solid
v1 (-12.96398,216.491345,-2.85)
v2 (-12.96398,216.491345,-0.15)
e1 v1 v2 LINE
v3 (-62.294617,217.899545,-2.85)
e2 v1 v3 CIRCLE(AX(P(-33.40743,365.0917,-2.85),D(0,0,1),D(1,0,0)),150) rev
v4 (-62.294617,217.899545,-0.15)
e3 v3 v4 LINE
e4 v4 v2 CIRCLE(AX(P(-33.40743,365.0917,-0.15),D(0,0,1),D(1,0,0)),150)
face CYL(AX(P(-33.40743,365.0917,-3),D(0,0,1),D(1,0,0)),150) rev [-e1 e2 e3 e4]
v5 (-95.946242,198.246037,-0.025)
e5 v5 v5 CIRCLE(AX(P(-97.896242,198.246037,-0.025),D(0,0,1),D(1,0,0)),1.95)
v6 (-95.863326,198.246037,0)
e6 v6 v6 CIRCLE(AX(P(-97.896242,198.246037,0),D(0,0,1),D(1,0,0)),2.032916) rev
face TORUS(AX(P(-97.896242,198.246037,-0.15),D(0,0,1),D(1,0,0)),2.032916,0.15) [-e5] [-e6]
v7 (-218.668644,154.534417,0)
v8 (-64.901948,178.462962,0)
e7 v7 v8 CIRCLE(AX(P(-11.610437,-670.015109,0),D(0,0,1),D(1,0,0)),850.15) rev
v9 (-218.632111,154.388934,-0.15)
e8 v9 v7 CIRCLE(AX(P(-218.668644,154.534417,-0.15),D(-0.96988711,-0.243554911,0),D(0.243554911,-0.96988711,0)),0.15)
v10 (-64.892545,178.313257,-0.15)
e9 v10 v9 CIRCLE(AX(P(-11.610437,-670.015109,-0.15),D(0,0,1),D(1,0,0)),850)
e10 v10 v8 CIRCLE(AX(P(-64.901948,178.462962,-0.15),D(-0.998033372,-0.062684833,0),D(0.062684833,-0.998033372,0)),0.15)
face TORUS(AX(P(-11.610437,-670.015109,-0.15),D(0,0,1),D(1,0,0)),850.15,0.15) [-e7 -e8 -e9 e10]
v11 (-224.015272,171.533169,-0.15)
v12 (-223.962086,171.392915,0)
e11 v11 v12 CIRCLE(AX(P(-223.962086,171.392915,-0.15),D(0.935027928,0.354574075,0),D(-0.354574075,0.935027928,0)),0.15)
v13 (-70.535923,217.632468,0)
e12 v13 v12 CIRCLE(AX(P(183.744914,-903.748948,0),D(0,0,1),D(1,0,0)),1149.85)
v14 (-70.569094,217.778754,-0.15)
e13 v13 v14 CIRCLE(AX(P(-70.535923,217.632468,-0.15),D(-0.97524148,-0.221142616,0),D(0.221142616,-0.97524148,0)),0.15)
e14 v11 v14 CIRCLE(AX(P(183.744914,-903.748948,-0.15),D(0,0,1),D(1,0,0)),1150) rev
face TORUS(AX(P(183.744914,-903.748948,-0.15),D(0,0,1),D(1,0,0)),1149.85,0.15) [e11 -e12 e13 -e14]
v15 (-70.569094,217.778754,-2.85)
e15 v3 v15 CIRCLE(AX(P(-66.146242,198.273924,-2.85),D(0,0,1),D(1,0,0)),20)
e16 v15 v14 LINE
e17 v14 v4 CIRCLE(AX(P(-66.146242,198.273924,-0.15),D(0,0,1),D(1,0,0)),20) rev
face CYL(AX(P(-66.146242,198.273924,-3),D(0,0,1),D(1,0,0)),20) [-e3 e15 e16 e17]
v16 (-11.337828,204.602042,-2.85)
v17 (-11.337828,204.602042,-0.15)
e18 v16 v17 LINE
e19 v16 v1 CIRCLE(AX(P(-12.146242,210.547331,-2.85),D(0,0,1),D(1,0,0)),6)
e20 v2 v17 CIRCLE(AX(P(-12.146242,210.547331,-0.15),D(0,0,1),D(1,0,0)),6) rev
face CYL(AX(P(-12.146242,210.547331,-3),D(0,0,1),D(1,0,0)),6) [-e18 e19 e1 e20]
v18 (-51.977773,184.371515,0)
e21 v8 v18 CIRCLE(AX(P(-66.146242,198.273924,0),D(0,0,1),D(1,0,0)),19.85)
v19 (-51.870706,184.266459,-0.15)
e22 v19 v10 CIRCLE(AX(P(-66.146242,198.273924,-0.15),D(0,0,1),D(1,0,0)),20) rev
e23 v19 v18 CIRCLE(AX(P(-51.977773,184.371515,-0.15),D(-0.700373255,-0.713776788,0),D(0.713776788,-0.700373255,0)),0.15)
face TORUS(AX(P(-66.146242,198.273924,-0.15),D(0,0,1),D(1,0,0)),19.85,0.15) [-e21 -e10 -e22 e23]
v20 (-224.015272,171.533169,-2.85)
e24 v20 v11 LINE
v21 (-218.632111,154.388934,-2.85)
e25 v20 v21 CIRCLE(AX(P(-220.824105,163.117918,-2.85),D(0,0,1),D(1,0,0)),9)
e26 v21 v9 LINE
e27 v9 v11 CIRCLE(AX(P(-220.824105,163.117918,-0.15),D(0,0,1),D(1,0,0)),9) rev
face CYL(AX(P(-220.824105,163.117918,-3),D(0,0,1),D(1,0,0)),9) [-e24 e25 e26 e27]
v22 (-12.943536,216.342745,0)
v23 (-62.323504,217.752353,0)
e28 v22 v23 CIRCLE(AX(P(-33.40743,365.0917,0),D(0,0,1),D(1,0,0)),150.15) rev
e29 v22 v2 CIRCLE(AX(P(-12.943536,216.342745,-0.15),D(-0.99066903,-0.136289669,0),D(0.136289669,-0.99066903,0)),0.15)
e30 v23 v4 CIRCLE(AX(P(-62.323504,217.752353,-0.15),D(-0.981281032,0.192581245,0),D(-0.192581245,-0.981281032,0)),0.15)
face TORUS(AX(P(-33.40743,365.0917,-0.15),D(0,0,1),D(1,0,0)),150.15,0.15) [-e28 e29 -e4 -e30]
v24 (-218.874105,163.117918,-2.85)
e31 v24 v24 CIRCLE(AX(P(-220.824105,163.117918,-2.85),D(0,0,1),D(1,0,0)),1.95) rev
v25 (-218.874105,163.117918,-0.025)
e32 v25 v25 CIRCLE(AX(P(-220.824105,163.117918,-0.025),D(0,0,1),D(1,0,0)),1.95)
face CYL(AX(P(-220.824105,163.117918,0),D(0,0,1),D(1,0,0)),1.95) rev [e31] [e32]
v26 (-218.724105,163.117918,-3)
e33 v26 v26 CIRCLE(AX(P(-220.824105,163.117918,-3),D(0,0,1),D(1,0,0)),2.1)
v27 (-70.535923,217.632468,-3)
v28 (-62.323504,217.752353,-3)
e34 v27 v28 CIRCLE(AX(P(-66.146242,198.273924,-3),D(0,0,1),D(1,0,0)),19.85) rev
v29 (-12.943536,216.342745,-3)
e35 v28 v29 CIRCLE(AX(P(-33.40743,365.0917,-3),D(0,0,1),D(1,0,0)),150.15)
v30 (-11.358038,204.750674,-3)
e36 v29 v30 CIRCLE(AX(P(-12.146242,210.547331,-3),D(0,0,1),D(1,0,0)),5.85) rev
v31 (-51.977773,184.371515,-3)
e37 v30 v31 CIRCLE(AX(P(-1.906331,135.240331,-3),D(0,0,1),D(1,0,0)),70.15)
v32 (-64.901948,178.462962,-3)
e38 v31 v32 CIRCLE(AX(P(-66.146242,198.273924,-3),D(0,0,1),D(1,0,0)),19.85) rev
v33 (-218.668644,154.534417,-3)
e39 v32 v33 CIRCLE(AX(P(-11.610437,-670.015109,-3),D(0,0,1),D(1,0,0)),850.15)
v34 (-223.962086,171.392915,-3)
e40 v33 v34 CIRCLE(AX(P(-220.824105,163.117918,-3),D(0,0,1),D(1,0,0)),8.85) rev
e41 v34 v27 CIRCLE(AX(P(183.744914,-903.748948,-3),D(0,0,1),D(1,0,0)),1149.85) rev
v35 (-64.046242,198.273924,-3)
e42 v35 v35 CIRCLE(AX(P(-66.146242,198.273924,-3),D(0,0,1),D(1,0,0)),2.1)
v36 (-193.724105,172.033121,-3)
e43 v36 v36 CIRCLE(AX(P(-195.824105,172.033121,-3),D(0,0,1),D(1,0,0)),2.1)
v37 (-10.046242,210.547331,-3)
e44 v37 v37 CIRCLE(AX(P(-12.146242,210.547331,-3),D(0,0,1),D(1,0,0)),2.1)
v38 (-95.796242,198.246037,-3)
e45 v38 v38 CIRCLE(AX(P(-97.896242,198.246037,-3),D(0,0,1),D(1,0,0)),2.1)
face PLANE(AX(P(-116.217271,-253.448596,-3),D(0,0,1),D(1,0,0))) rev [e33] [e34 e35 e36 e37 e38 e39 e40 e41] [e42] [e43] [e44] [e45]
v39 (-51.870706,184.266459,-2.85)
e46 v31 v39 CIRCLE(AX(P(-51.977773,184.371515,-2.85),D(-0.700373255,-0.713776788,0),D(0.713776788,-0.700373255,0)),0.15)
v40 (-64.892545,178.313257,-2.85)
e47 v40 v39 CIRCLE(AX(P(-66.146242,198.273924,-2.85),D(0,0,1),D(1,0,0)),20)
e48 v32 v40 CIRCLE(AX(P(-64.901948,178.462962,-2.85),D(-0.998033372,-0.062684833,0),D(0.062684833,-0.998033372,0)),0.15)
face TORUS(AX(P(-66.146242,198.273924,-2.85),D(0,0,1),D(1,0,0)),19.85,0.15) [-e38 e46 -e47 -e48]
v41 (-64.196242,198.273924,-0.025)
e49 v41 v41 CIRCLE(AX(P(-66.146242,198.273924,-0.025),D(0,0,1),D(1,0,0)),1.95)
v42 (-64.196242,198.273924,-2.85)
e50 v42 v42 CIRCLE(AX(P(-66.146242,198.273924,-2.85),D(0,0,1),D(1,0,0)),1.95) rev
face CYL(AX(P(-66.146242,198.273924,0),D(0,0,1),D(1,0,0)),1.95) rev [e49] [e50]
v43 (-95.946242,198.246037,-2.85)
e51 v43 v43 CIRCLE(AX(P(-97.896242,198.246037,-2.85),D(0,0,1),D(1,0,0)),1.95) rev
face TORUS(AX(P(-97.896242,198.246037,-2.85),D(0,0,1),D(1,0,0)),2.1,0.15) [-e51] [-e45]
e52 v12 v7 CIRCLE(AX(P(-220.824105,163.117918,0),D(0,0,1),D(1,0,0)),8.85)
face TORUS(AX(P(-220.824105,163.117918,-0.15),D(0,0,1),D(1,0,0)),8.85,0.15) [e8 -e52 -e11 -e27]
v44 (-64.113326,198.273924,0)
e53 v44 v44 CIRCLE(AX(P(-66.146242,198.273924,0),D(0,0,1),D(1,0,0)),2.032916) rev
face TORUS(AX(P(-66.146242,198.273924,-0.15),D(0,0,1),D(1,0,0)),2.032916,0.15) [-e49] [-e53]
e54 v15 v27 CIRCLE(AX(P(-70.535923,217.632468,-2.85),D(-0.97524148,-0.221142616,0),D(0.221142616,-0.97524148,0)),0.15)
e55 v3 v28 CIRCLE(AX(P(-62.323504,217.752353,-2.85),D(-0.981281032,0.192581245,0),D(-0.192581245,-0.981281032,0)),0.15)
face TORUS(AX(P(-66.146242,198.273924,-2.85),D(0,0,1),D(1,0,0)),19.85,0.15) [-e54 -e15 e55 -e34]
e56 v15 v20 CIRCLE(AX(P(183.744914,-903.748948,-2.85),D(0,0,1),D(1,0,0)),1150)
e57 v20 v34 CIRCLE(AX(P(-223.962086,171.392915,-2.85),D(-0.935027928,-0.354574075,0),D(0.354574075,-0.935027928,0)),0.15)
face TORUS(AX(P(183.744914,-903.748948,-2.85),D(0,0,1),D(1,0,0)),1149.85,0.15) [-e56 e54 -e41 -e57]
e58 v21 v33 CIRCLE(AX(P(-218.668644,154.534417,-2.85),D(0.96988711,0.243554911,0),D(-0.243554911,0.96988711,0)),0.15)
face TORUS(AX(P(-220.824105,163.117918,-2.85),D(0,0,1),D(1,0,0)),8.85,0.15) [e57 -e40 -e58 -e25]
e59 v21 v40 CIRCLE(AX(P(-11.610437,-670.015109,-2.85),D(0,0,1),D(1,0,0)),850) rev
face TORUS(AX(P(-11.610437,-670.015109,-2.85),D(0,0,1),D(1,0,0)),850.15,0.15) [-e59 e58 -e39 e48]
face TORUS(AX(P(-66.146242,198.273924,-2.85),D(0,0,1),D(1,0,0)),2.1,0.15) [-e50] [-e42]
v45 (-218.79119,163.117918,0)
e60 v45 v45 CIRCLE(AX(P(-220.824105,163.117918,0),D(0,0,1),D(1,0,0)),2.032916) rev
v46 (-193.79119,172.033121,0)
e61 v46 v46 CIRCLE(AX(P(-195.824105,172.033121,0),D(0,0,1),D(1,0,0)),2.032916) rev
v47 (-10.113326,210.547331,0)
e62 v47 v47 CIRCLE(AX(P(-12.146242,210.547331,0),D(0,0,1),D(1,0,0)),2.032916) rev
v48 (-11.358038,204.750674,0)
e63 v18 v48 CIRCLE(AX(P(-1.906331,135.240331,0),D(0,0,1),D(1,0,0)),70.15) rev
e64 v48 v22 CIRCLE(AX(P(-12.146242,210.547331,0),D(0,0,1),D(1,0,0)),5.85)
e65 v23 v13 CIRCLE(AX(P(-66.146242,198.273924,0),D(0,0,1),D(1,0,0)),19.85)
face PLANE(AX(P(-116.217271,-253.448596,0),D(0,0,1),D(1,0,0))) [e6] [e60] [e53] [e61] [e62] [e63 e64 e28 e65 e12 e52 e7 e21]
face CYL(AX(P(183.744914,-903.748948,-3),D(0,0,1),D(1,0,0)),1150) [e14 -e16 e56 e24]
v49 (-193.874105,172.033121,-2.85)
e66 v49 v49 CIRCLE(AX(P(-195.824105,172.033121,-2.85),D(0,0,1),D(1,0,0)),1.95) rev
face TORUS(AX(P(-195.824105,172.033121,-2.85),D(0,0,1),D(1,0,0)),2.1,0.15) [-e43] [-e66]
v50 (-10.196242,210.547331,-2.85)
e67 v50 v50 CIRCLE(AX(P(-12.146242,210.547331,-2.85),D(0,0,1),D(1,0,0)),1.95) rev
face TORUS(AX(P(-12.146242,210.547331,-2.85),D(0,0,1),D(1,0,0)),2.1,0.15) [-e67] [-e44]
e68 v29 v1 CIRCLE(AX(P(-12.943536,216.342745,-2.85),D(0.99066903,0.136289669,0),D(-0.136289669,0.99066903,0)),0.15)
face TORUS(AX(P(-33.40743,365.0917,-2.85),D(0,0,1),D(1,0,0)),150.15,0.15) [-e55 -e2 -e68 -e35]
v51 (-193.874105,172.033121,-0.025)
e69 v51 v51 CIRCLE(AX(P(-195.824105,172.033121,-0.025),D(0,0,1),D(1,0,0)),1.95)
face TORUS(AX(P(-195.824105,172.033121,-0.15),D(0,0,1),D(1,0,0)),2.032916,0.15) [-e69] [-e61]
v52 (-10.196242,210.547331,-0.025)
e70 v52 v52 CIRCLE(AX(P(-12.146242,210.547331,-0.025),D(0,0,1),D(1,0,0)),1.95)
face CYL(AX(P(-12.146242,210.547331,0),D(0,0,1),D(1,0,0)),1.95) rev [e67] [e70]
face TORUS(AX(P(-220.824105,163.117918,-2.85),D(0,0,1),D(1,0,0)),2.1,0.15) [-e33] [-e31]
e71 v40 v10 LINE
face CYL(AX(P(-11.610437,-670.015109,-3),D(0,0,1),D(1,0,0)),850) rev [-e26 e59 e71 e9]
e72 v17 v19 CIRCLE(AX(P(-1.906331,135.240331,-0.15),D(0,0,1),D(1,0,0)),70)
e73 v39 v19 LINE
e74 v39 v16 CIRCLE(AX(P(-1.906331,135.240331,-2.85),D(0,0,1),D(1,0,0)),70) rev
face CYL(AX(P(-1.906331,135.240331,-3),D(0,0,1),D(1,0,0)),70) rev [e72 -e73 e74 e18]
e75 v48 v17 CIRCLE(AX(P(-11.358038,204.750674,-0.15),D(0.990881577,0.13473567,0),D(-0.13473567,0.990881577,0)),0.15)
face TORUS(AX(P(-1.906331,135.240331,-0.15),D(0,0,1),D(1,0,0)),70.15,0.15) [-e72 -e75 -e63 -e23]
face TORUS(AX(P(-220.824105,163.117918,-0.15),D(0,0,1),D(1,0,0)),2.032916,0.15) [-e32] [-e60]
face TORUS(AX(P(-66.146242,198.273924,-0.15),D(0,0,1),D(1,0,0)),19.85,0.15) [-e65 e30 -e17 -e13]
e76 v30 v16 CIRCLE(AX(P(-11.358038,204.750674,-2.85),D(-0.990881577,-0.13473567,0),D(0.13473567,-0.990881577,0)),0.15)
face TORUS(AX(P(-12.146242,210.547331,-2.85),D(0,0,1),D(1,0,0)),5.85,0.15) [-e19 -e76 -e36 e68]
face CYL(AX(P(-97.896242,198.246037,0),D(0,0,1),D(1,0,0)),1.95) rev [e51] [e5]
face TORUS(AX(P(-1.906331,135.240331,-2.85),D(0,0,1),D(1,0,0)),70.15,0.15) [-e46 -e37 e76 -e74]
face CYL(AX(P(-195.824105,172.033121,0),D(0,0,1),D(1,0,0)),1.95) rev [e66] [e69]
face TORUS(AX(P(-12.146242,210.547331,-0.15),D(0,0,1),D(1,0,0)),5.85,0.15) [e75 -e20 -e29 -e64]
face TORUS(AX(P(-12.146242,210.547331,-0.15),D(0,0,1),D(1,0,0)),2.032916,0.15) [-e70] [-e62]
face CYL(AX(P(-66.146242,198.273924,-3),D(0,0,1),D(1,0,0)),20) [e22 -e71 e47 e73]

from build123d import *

# Parameters (mm, degrees)
BOSS_EXTRUDE1_DEPTH              = 3
M3_5_CLEARANCE_HOLE1_D           = 3.9
M3_5_CLEARANCE_HOLE1_DEPTH       = 10
M3_5_CLEARANCE_HOLE1_CSINK_D     = 3.95
M3_5_CLEARANCE_HOLE1_CSINK_ANGLE = 90
M3_5_CLEARANCE_HOLE1_TIP         = 1.171678207
FILLET1_R                        = 0.15


with BuildPart() as part:
    # Sketch1 → Boss-Extrude1 (new body)
    with BuildSketch(Plane.XY):
        with BuildLine():
            ThreePointArc((-224.015272003, 171.533169094), (-148.098758742, 197.332237707), (-70.569094062, 217.778753835))
            ThreePointArc((-70.569094062, 217.778753835), (-66.438171207, 218.27179356), (-62.294616847, 217.899544886))
            ThreePointArc((-62.294616847, 217.899544886), (-37.687608562, 215.152778571), (-12.963979761, 216.491345274))
            ThreePointArc((-12.963979761, 216.491345274), (-6.2015881, 211.360407363), (-11.337827727, 204.602041635))
            ThreePointArc((-11.337827727, 204.602041635), (-33.296637982, 197.807484116), (-51.870705986, 184.266459136))
            ThreePointArc((-51.870705986, 184.266459136), (-57.830628756, 180.084625725), (-64.892545086, 178.313256803))
            ThreePointArc((-64.892545086, 178.313256803), (-142.310888673, 169.876188253), (-218.632111132, 154.388933759))
            ThreePointArc((-218.632111132, 154.388933759), (-229.410768693, 160.421770071), (-224.015272003, 171.533169094))
        make_face()
    extrude(amount=-BOSS_EXTRUDE1_DEPTH)

    # M3.5 Clearance Hole1
    with Locations(Plane.XY):
        with Locations((-220.824105329, 163.117917746), (-195.824105329, 172.033120757), (-97.896241747, 198.246037312), (-66.146241747, 198.273924243), (-12.146241747, 210.547331096)):
            CounterSinkHole(M3_5_CLEARANCE_HOLE1_D / 2, M3_5_CLEARANCE_HOLE1_CSINK_D / 2, depth=M3_5_CLEARANCE_HOLE1_DEPTH, counter_sink_angle=M3_5_CLEARANCE_HOLE1_CSINK_ANGLE)
            with Locations((0, 0, -(M3_5_CLEARANCE_HOLE1_DEPTH + M3_5_CLEARANCE_HOLE1_TIP / 2))):  # 118° drill point
                Cone(0, M3_5_CLEARANCE_HOLE1_D / 2, M3_5_CLEARANCE_HOLE1_TIP, mode=Mode.SUBTRACT)

    # Fillet1
    # the kernel refuses this fillet: 0.15 mm, written as the material it takes off along each edge
    with BuildSketch(Plane(origin=(-1.906330822, 135.24033126, 0), x_dir=(-0.1347356700689116, 0.9908815767845728, 0), z_dir=(0.9908815767845728, 0.1347356700689116, 0))) as fillet1_piece_1:
        with BuildLine():
            CenterArc((70 + FILLET1_R, -FILLET1_R), FILLET1_R, 90, 90)
            Line((70 + FILLET1_R, 0), (70 + FILLET1_R, FILLET1_R * 0.02))
            Line((70 + FILLET1_R, FILLET1_R * 0.02), (70 - FILLET1_R * 0.0200000000001, FILLET1_R * 0.02))
            Line((70 - FILLET1_R * 0.0200000000001, FILLET1_R * 0.02), (70 - FILLET1_R * 0.0200000000001, -FILLET1_R))
            Line((70 - FILLET1_R * 0.0200000000001, -FILLET1_R), (70, -FILLET1_R))
        make_face()
    revolve(axis=Axis((-1.906330822, 135.24033126, 0), (0, 0, 1)), revolution_arc=37.799706741, mode=Mode.SUBTRACT)
    with BuildSketch(Plane(origin=(-66.146241747, 198.273924243, 0), x_dir=(0.7137767880581837, -0.7003732553641258, 0), z_dir=(0.7003732553641258, 0.7137767880581837, 0))) as fillet1_piece_2:
        with BuildLine():
            CenterArc((20 - FILLET1_R, FILLET1_R), FILLET1_R, 270, 90)
            Line((20 - FILLET1_R, 0), (20 - FILLET1_R, -FILLET1_R * 0.02))
            Line((20 - FILLET1_R, -FILLET1_R * 0.02), (20 + FILLET1_R * 0.02, -FILLET1_R * 0.02))
            Line((20 + FILLET1_R * 0.02, -FILLET1_R * 0.02), (20 + FILLET1_R * 0.0199999999999, FILLET1_R))
            Line((20 + FILLET1_R * 0.0199999999999, FILLET1_R), (20, FILLET1_R))
        make_face()
    revolve(axis=Axis((-66.146241747, 198.273924243, 0), (0, 0, -1)), revolution_arc=41.949109333, mode=Mode.SUBTRACT)
    with BuildSketch(Plane(origin=(-11.610436968, -670.01510943, 0), x_dir=(-0.0626848330802095, 0.9980333720380827, 0), z_dir=(0.9980333720380827, 0.0626848330802095, 0))) as fillet1_piece_3:
        with BuildLine():
            CenterArc((850 + FILLET1_R, -FILLET1_R), FILLET1_R, 90, 90)
            Line((850, -FILLET1_R), (850 - FILLET1_R * 0.0200000000003, -FILLET1_R))
            Line((850 - FILLET1_R * 0.0200000000003, -FILLET1_R), (850 - FILLET1_R * 0.0200000000003, FILLET1_R * 0.02))
            Line((850 - FILLET1_R * 0.0200000000003, FILLET1_R * 0.02), (850 + FILLET1_R, FILLET1_R * 0.02))
            Line((850 + FILLET1_R, FILLET1_R * 0.02), (850 + FILLET1_R, 0))
        make_face()
    revolve(axis=Axis((-11.610436968, -670.01510943, 0), (0, 0, 1)), revolution_arc=10.502516864, mode=Mode.SUBTRACT)
    with BuildSketch(Plane(origin=(-220.824105329, 163.117917746, 0), x_dir=(0.24355491078225822, -0.9698871096338203, 0), z_dir=(0.9698871096338203, 0.24355491078225822, 0))) as fillet1_piece_4:
        with BuildLine():
            CenterArc((9 - FILLET1_R, FILLET1_R), FILLET1_R, 270, 90)
            Line((9 - FILLET1_R, 0), (9 - FILLET1_R, -FILLET1_R * 0.02))
            Line((9 - FILLET1_R, -FILLET1_R * 0.02), (9 + FILLET1_R * 0.0200000000001, -FILLET1_R * 0.02))
            Line((9 + FILLET1_R * 0.0200000000001, -FILLET1_R * 0.02), (9 + FILLET1_R * 0.0200000000001, FILLET1_R))
            Line((9 + FILLET1_R * 0.0200000000001, FILLET1_R), (9, FILLET1_R))
        make_face()
    revolve(axis=Axis((-220.824105329, 163.117917746, 0), (0, 0, -1)), revolution_arc=173.329106849, mode=Mode.SUBTRACT)
    with BuildSketch(Plane(origin=(-66.146241747, 198.273924243, -3), x_dir=(0.7137767880581837, -0.7003732553641258, 0), z_dir=(0.7003732553641258, 0.7137767880581837, 0))) as fillet1_piece_5:
        with BuildLine():
            CenterArc((20 - FILLET1_R, -FILLET1_R), FILLET1_R, 0, 90)
            Line((20, -FILLET1_R), (20 + FILLET1_R * 0.0199999999999, -FILLET1_R))
            Line((20 + FILLET1_R * 0.0199999999999, -FILLET1_R), (20 + FILLET1_R * 0.02, FILLET1_R * 0.02))
            Line((20 + FILLET1_R * 0.02, FILLET1_R * 0.02), (20 - FILLET1_R, FILLET1_R * 0.02))
            Line((20 - FILLET1_R, FILLET1_R * 0.02), (20 - FILLET1_R, 0))
        make_face()
    revolve(axis=Axis((-66.146241747, 198.273924243, -3), (0, 0, -1)), revolution_arc=41.949109333, mode=Mode.SUBTRACT)
    with BuildSketch(Plane(origin=(-1.906330822, 135.24033126, -3), x_dir=(-0.1347356700689116, 0.9908815767845728, 0), z_dir=(0.9908815767845728, 0.1347356700689116, 0))) as fillet1_piece_6:
        with BuildLine():
            CenterArc((70 + FILLET1_R, FILLET1_R), FILLET1_R, 180, 90)
            Line((70, FILLET1_R), (70 - FILLET1_R * 0.0200000000001, FILLET1_R))
            Line((70 - FILLET1_R * 0.0200000000001, FILLET1_R), (70 - FILLET1_R * 0.0200000000001, -FILLET1_R * 0.02))
            Line((70 - FILLET1_R * 0.0200000000001, -FILLET1_R * 0.02), (70 + FILLET1_R, -FILLET1_R * 0.02))
            Line((70 + FILLET1_R, -FILLET1_R * 0.02), (70 + FILLET1_R, 0))
        make_face()
    revolve(axis=Axis((-1.906330822, 135.24033126, -3), (0, 0, 1)), revolution_arc=37.799706741, mode=Mode.SUBTRACT)
    with BuildSketch(Plane(origin=(-12.146241747, 210.547331096, -3), x_dir=(-0.1362896688862403, 0.9906690295728836, 0), z_dir=(-0.9906690295728836, -0.1362896688862403, 0))) as fillet1_piece_7:
        with BuildLine():
            CenterArc((6 - FILLET1_R, -FILLET1_R), FILLET1_R, 0, 90)
            Line((6, -FILLET1_R), (6 + FILLET1_R * 0.02, -FILLET1_R))
            Line((6 + FILLET1_R * 0.02, -FILLET1_R), (6 + FILLET1_R * 0.02, FILLET1_R * 0.02))
            Line((6 + FILLET1_R * 0.02, FILLET1_R * 0.02), (6 - FILLET1_R, FILLET1_R * 0.02))
            Line((6 - FILLET1_R, FILLET1_R * 0.02), (6 - FILLET1_R, 0))
        make_face()
    revolve(axis=Axis((-12.146241747, 210.547331096, -3), (0, 0, -1)), revolution_arc=180.089866547, mode=Mode.SUBTRACT)
    with BuildSketch(Plane(origin=(-33.407430094, 365.091699709, -3), x_dir=(-0.19258124502204366, -0.9812810321542751, 0), z_dir=(-0.9812810321542751, 0.19258124502204366, 0))) as fillet1_piece_8:
        with BuildLine():
            CenterArc((150 + FILLET1_R, FILLET1_R), FILLET1_R, 180, 90)
            Line((150, FILLET1_R), (150 - FILLET1_R * 0.0199999999999, FILLET1_R))
            Line((150 - FILLET1_R * 0.0199999999999, FILLET1_R), (150 - FILLET1_R * 0.0199999999999, -FILLET1_R * 0.02))
            Line((150 - FILLET1_R * 0.0199999999999, -FILLET1_R * 0.02), (150 + FILLET1_R, -FILLET1_R * 0.02))
            Line((150 + FILLET1_R, -FILLET1_R * 0.02), (150 + FILLET1_R, 0))
        make_face()
    revolve(axis=Axis((-33.407430094, 365.091699709, -3), (0, 0, 1)), revolution_arc=18.936662977, mode=Mode.SUBTRACT)
    with BuildSketch(Plane(origin=(-66.146241747, 198.273924243, -3), x_dir=(-0.22114261575913643, 0.9752414795809328, 0), z_dir=(-0.9752414795809328, -0.22114261575913643, 0))) as fillet1_piece_9:
        with BuildLine():
            CenterArc((20 - FILLET1_R, -FILLET1_R), FILLET1_R, 0, 90)
            Line((20, -FILLET1_R), (20 + FILLET1_R * 0.02, -FILLET1_R))
            Line((20 + FILLET1_R * 0.02, -FILLET1_R), (20 + FILLET1_R * 0.02, FILLET1_R * 0.02))
            Line((20 + FILLET1_R * 0.02, FILLET1_R * 0.02), (20 - FILLET1_R, FILLET1_R * 0.02))
            Line((20 - FILLET1_R, FILLET1_R * 0.02), (20 - FILLET1_R, 0))
        make_face()
    revolve(axis=Axis((-66.146241747, 198.273924243, -3), (0, 0, -1)), revolution_arc=23.879614349, mode=Mode.SUBTRACT)
    with BuildSketch(Plane(origin=(-12.146241747, 210.547331096, -3), x_dir=(-1, 0, 0), z_dir=(0, -1, 0))) as fillet1_piece_10:
        with BuildLine():
            CenterArc((1.95 + FILLET1_R, -FILLET1_R), FILLET1_R, 90, 90)
            Line((1.95, -FILLET1_R), (1.95 - FILLET1_R * 0.02, -FILLET1_R))
            Line((1.95 - FILLET1_R * 0.02, -FILLET1_R), (1.95 - FILLET1_R * 0.02, FILLET1_R * 0.02))
            Line((1.95 - FILLET1_R * 0.02, FILLET1_R * 0.02), (1.95 + FILLET1_R, FILLET1_R * 0.02))
            Line((1.95 + FILLET1_R, FILLET1_R * 0.02), (1.95 + FILLET1_R, 0))
        make_face()
    revolve(axis=Axis((-12.146241747, 210.547331096, -3), (0, 0, -1)), mode=Mode.SUBTRACT)
    with BuildSketch(Plane(origin=(-12.146241747, 210.547331096, 0), x_dir=(-1, 0, 0), z_dir=(0, -1, 0))) as fillet1_piece_11:
        with BuildLine():
            CenterArc((2.03291562, 0.15), FILLET1_R, 236.442690238, 33.557309762)
            Line((2.03291562, 0), (2.03291562, -0.003))
            Line((2.03291562, -0.003), (1.975, -0.003))
            Line((1.975, -0.003), (1.97287868, -0.00212132))
            ThreePointArc((1.97287868, -0.00212132), (1.96037868, 0.01037868), (1.948341688, 0.0225))
            Line((1.948341688, 0.0225), (1.95, 0.025))
        make_face()
    revolve(axis=Axis((-12.146241747, 210.547331096, 0), (0, 0, -1)), mode=Mode.SUBTRACT)
    with BuildSketch(Plane(origin=(183.744914061, -903.748947683, -3), x_dir=(-0.3545740748378603, 0.935027927632579, 0), z_dir=(-0.935027927632579, -0.3545740748378603, 0))) as fillet1_piece_12:
        with BuildLine():
            CenterArc((1150 - FILLET1_R, -FILLET1_R), FILLET1_R, 0, 90)
            Line((1150, -FILLET1_R), (1150 + FILLET1_R * 0.020000000001, -FILLET1_R))
            Line((1150 + FILLET1_R * 0.020000000001, -FILLET1_R), (1150 + FILLET1_R * 0.020000000001, FILLET1_R * 0.02))
            Line((1150 + FILLET1_R * 0.020000000001, FILLET1_R * 0.02), (1150 - FILLET1_R, FILLET1_R * 0.02))
            Line((1150 - FILLET1_R, FILLET1_R * 0.02), (1150 - FILLET1_R, 0))
        make_face()
    revolve(axis=Axis((183.744914061, -903.748947683, -3), (0, 0, -1)), revolution_arc=7.991189503, mode=Mode.SUBTRACT)
    with BuildSketch(Plane(origin=(-66.146241747, 198.273924243, -3), x_dir=(-1, 0, 0), z_dir=(0, -1, 0))) as fillet1_piece_13:
        with BuildLine():
            CenterArc((1.95 + FILLET1_R, -FILLET1_R), FILLET1_R, 90, 90)
            Line((1.95, -FILLET1_R), (1.95 - FILLET1_R * 0.02, -FILLET1_R))
            Line((1.95 - FILLET1_R * 0.02, -FILLET1_R), (1.95 - FILLET1_R * 0.02, FILLET1_R * 0.02))
            Line((1.95 - FILLET1_R * 0.02, FILLET1_R * 0.02), (1.95 + FILLET1_R, FILLET1_R * 0.02))
            Line((1.95 + FILLET1_R, FILLET1_R * 0.02), (1.95 + FILLET1_R, 0))
        make_face()
    revolve(axis=Axis((-66.146241747, 198.273924243, -3), (0, 0, -1)), mode=Mode.SUBTRACT)
    with BuildSketch(Plane(origin=(-66.146241747, 198.273924243, 0), x_dir=(-1, 0, 0), z_dir=(0, -1, 0))) as fillet1_piece_14:
        with BuildLine():
            CenterArc((2.03291562, 0.15), FILLET1_R, 236.442690238, 33.557309762)
            Line((2.03291562, 0), (2.03291562, -0.003))
            Line((2.03291562, -0.003), (1.975, -0.003))
            Line((1.975, -0.003), (1.97287868, -0.00212132))
            ThreePointArc((1.97287868, -0.00212132), (1.96037868, 0.01037868), (1.948341688, 0.0225))
            Line((1.948341688, 0.0225), (1.95, 0.025))
        make_face()
    revolve(axis=Axis((-66.146241747, 198.273924243, 0), (0, 0, -1)), mode=Mode.SUBTRACT)
    with BuildSketch(Plane(origin=(-97.896241747, 198.246037312, -3), x_dir=(-1, 0, 0), z_dir=(0, -1, 0))) as fillet1_piece_15:
        with BuildLine():
            CenterArc((1.95 + FILLET1_R, -FILLET1_R), FILLET1_R, 90, 90)
            Line((1.95, -FILLET1_R), (1.95 - FILLET1_R * 0.02, -FILLET1_R))
            Line((1.95 - FILLET1_R * 0.02, -FILLET1_R), (1.95 - FILLET1_R * 0.02, FILLET1_R * 0.02))
            Line((1.95 - FILLET1_R * 0.02, FILLET1_R * 0.02), (1.95 + FILLET1_R, FILLET1_R * 0.02))
            Line((1.95 + FILLET1_R, FILLET1_R * 0.02), (1.95 + FILLET1_R, 0))
        make_face()
    revolve(axis=Axis((-97.896241747, 198.246037312, -3), (0, 0, -1)), mode=Mode.SUBTRACT)
    with BuildSketch(Plane(origin=(-97.896241747, 198.246037312, 0), x_dir=(-1, 0, 0), z_dir=(0, -1, 0))) as fillet1_piece_16:
        with BuildLine():
            CenterArc((2.03291562, 0.15), FILLET1_R, 236.442690238, 33.557309762)
            Line((2.03291562, 0), (2.03291562, -0.003))
            Line((2.03291562, -0.003), (1.975, -0.003))
            Line((1.975, -0.003), (1.97287868, -0.00212132))
            ThreePointArc((1.97287868, -0.00212132), (1.96037868, 0.01037868), (1.948341688, 0.0225))
            Line((1.948341688, 0.0225), (1.95, 0.025))
        make_face()
    revolve(axis=Axis((-97.896241747, 198.246037312, 0), (0, 0, -1)), mode=Mode.SUBTRACT)
    with BuildSketch(Plane(origin=(-220.824105329, 163.117917746, -3), x_dir=(0.24355491078225822, -0.9698871096338203, 0), z_dir=(0.9698871096338203, 0.24355491078225822, 0))) as fillet1_piece_17:
        with BuildLine():
            CenterArc((9 - FILLET1_R, -FILLET1_R), FILLET1_R, 0, 90)
            Line((9 - FILLET1_R, 0), (9 - FILLET1_R, FILLET1_R * 0.02))
            Line((9 - FILLET1_R, FILLET1_R * 0.02), (9 + FILLET1_R * 0.0200000000001, FILLET1_R * 0.02))
            Line((9 + FILLET1_R * 0.0200000000001, FILLET1_R * 0.02), (9 + FILLET1_R * 0.0200000000001, -FILLET1_R))
            Line((9 + FILLET1_R * 0.0200000000001, -FILLET1_R), (9, -FILLET1_R))
        make_face()
    revolve(axis=Axis((-220.824105329, 163.117917746, -3), (0, 0, -1)), revolution_arc=173.329106849, mode=Mode.SUBTRACT)
    with BuildSketch(Plane(origin=(-195.824105329, 172.033120757, -3), x_dir=(-1, 0, 0), z_dir=(0, -1, 0))) as fillet1_piece_18:
        with BuildLine():
            CenterArc((1.95 + FILLET1_R, -FILLET1_R), FILLET1_R, 90, 90)
            Line((1.95, -FILLET1_R), (1.95 - FILLET1_R * 0.0199999999999, -FILLET1_R))
            Line((1.95 - FILLET1_R * 0.0199999999999, -FILLET1_R), (1.95 - FILLET1_R * 0.0199999999999, FILLET1_R * 0.02))
            Line((1.95 - FILLET1_R * 0.0199999999999, FILLET1_R * 0.02), (1.95 + FILLET1_R, FILLET1_R * 0.02))
            Line((1.95 + FILLET1_R, FILLET1_R * 0.02), (1.95 + FILLET1_R, 0))
        make_face()
    revolve(axis=Axis((-195.824105329, 172.033120757, -3), (0, 0, -1)), mode=Mode.SUBTRACT)
    with BuildSketch(Plane(origin=(-195.824105329, 172.033120757, 0), x_dir=(-1, 0, 0), z_dir=(0, -1, 0))) as fillet1_piece_19:
        with BuildLine():
            CenterArc((2.03291562, 0.15), FILLET1_R, 236.442690238, 33.557309762)
            Line((2.03291562, 0), (2.03291562, -0.003))
            Line((2.03291562, -0.003), (1.975, -0.003))
            Line((1.975, -0.003), (1.97287868, -0.00212132))
            ThreePointArc((1.97287868, -0.00212132), (1.96037868, 0.01037868), (1.948341688, 0.0225))
            Line((1.948341688, 0.0225), (1.95, 0.025))
        make_face()
    revolve(axis=Axis((-195.824105329, 172.033120757, 0), (0, 0, -1)), mode=Mode.SUBTRACT)
    with BuildSketch(Plane(origin=(-220.824105329, 163.117917746, -3), x_dir=(-1, 0, 0), z_dir=(0, -1, 0))) as fillet1_piece_20:
        with BuildLine():
            CenterArc((1.95 + FILLET1_R, -FILLET1_R), FILLET1_R, 90, 90)
            Line((1.95, -FILLET1_R), (1.95 - FILLET1_R * 0.0199999999999, -FILLET1_R))
            Line((1.95 - FILLET1_R * 0.0199999999999, -FILLET1_R), (1.95 - FILLET1_R * 0.0199999999999, FILLET1_R * 0.02))
            Line((1.95 - FILLET1_R * 0.0199999999999, FILLET1_R * 0.02), (1.95 + FILLET1_R, FILLET1_R * 0.02))
            Line((1.95 + FILLET1_R, FILLET1_R * 0.02), (1.95 + FILLET1_R, 0))
        make_face()
    revolve(axis=Axis((-220.824105329, 163.117917746, -3), (0, 0, -1)), mode=Mode.SUBTRACT)
    with BuildSketch(Plane(origin=(-220.824105329, 163.117917746, 0), x_dir=(-1, 0, 0), z_dir=(0, -1, 0))) as fillet1_piece_21:
        with BuildLine():
            CenterArc((2.03291562, 0.15), FILLET1_R, 236.442690238, 33.557309762)
            Line((2.03291562, 0), (2.03291562, -0.003))
            Line((2.03291562, -0.003), (1.975, -0.003))
            Line((1.975, -0.003), (1.97287868, -0.00212132))
            ThreePointArc((1.97287868, -0.00212132), (1.96037868, 0.01037868), (1.948341688, 0.0225))
            Line((1.948341688, 0.0225), (1.95, 0.025))
        make_face()
    revolve(axis=Axis((-220.824105329, 163.117917746, 0), (0, 0, -1)), mode=Mode.SUBTRACT)
    with BuildSketch(Plane(origin=(183.744914061, -903.748947683, 0), x_dir=(-0.3545740748378603, 0.935027927632579, 0), z_dir=(-0.935027927632579, -0.3545740748378603, 0))) as fillet1_piece_22:
        with BuildLine():
            CenterArc((1150 - FILLET1_R, FILLET1_R), FILLET1_R, 270, 90)
            Line((1150, FILLET1_R), (1150 + FILLET1_R * 0.020000000001, FILLET1_R))
            Line((1150 + FILLET1_R * 0.020000000001, FILLET1_R), (1150 + FILLET1_R * 0.020000000001, -FILLET1_R * 0.02))
            Line((1150 + FILLET1_R * 0.020000000001, -FILLET1_R * 0.02), (1150 - FILLET1_R, -FILLET1_R * 0.02))
            Line((1150 - FILLET1_R, -FILLET1_R * 0.02), (1150 - FILLET1_R, 0))
        make_face()
    revolve(axis=Axis((183.744914061, -903.748947683, 0), (0, 0, -1)), revolution_arc=7.991189503, mode=Mode.SUBTRACT)
    with BuildSketch(Plane(origin=(-11.610436968, -670.01510943, -3), x_dir=(-0.0626848330802095, 0.9980333720380827, 0), z_dir=(0.9980333720380827, 0.0626848330802095, 0))) as fillet1_piece_23:
        with BuildLine():
            CenterArc((850 + FILLET1_R, FILLET1_R), FILLET1_R, 180, 90)
            Line((850, FILLET1_R), (850 - FILLET1_R * 0.0200000000003, FILLET1_R))
            Line((850 - FILLET1_R * 0.0200000000003, FILLET1_R), (850 - FILLET1_R * 0.0200000000003, -FILLET1_R * 0.02))
            Line((850 - FILLET1_R * 0.0200000000003, -FILLET1_R * 0.02), (850 + FILLET1_R, -FILLET1_R * 0.02))
            Line((850 + FILLET1_R, -FILLET1_R * 0.02), (850 + FILLET1_R, 0))
        make_face()
    revolve(axis=Axis((-11.610436968, -670.01510943, -3), (0, 0, 1)), revolution_arc=10.502516864, mode=Mode.SUBTRACT)
    with BuildSketch(Plane(origin=(-66.146241747, 198.273924243, 0), x_dir=(-0.22114261575913643, 0.9752414795809328, 0), z_dir=(-0.9752414795809328, -0.22114261575913643, 0))) as fillet1_piece_24:
        with BuildLine():
            CenterArc((20 - FILLET1_R, FILLET1_R), FILLET1_R, 270, 90)
            Line((20 - FILLET1_R, 0), (20 - FILLET1_R, -FILLET1_R * 0.02))
            Line((20 - FILLET1_R, -FILLET1_R * 0.02), (20 + FILLET1_R * 0.02, -FILLET1_R * 0.02))
            Line((20 + FILLET1_R * 0.02, -FILLET1_R * 0.02), (20 + FILLET1_R * 0.02, FILLET1_R))
            Line((20 + FILLET1_R * 0.02, FILLET1_R), (20, FILLET1_R))
        make_face()
    revolve(axis=Axis((-66.146241747, 198.273924243, 0), (0, 0, -1)), revolution_arc=23.879614349, mode=Mode.SUBTRACT)
    with BuildSketch(Plane(origin=(-33.407430094, 365.091699709, 0), x_dir=(-0.19258124502204366, -0.9812810321542751, 0), z_dir=(-0.9812810321542751, 0.19258124502204366, 0))) as fillet1_piece_25:
        with BuildLine():
            CenterArc((150 + FILLET1_R, -FILLET1_R), FILLET1_R, 90, 90)
            Line((150 + FILLET1_R, 0), (150 + FILLET1_R, FILLET1_R * 0.02))
            Line((150 + FILLET1_R, FILLET1_R * 0.02), (150 - FILLET1_R * 0.0199999999999, FILLET1_R * 0.02))
            Line((150 - FILLET1_R * 0.0199999999999, FILLET1_R * 0.02), (150 - FILLET1_R * 0.0199999999999, -FILLET1_R))
            Line((150 - FILLET1_R * 0.0199999999999, -FILLET1_R), (150, -FILLET1_R))
        make_face()
    revolve(axis=Axis((-33.407430094, 365.091699709, 0), (0, 0, 1)), revolution_arc=18.936662977, mode=Mode.SUBTRACT)
    with BuildSketch(Plane(origin=(-12.146241747, 210.547331096, 0), x_dir=(-0.1362896688862403, 0.9906690295728836, 0), z_dir=(-0.9906690295728836, -0.1362896688862403, 0))) as fillet1_piece_26:
        with BuildLine():
            CenterArc((6 - FILLET1_R, FILLET1_R), FILLET1_R, 270, 90)
            Line((6 - FILLET1_R, 0), (6 - FILLET1_R, -FILLET1_R * 0.02))
            Line((6 - FILLET1_R, -FILLET1_R * 0.02), (6 + FILLET1_R * 0.02, -FILLET1_R * 0.02))
            Line((6 + FILLET1_R * 0.02, -FILLET1_R * 0.02), (6 + FILLET1_R * 0.02, FILLET1_R))
            Line((6 + FILLET1_R * 0.02, FILLET1_R), (6, FILLET1_R))
        make_face()
    revolve(axis=Axis((-12.146241747, 210.547331096, 0), (0, 0, -1)), revolution_arc=180.089866547, mode=Mode.SUBTRACT)


solid = part.part
